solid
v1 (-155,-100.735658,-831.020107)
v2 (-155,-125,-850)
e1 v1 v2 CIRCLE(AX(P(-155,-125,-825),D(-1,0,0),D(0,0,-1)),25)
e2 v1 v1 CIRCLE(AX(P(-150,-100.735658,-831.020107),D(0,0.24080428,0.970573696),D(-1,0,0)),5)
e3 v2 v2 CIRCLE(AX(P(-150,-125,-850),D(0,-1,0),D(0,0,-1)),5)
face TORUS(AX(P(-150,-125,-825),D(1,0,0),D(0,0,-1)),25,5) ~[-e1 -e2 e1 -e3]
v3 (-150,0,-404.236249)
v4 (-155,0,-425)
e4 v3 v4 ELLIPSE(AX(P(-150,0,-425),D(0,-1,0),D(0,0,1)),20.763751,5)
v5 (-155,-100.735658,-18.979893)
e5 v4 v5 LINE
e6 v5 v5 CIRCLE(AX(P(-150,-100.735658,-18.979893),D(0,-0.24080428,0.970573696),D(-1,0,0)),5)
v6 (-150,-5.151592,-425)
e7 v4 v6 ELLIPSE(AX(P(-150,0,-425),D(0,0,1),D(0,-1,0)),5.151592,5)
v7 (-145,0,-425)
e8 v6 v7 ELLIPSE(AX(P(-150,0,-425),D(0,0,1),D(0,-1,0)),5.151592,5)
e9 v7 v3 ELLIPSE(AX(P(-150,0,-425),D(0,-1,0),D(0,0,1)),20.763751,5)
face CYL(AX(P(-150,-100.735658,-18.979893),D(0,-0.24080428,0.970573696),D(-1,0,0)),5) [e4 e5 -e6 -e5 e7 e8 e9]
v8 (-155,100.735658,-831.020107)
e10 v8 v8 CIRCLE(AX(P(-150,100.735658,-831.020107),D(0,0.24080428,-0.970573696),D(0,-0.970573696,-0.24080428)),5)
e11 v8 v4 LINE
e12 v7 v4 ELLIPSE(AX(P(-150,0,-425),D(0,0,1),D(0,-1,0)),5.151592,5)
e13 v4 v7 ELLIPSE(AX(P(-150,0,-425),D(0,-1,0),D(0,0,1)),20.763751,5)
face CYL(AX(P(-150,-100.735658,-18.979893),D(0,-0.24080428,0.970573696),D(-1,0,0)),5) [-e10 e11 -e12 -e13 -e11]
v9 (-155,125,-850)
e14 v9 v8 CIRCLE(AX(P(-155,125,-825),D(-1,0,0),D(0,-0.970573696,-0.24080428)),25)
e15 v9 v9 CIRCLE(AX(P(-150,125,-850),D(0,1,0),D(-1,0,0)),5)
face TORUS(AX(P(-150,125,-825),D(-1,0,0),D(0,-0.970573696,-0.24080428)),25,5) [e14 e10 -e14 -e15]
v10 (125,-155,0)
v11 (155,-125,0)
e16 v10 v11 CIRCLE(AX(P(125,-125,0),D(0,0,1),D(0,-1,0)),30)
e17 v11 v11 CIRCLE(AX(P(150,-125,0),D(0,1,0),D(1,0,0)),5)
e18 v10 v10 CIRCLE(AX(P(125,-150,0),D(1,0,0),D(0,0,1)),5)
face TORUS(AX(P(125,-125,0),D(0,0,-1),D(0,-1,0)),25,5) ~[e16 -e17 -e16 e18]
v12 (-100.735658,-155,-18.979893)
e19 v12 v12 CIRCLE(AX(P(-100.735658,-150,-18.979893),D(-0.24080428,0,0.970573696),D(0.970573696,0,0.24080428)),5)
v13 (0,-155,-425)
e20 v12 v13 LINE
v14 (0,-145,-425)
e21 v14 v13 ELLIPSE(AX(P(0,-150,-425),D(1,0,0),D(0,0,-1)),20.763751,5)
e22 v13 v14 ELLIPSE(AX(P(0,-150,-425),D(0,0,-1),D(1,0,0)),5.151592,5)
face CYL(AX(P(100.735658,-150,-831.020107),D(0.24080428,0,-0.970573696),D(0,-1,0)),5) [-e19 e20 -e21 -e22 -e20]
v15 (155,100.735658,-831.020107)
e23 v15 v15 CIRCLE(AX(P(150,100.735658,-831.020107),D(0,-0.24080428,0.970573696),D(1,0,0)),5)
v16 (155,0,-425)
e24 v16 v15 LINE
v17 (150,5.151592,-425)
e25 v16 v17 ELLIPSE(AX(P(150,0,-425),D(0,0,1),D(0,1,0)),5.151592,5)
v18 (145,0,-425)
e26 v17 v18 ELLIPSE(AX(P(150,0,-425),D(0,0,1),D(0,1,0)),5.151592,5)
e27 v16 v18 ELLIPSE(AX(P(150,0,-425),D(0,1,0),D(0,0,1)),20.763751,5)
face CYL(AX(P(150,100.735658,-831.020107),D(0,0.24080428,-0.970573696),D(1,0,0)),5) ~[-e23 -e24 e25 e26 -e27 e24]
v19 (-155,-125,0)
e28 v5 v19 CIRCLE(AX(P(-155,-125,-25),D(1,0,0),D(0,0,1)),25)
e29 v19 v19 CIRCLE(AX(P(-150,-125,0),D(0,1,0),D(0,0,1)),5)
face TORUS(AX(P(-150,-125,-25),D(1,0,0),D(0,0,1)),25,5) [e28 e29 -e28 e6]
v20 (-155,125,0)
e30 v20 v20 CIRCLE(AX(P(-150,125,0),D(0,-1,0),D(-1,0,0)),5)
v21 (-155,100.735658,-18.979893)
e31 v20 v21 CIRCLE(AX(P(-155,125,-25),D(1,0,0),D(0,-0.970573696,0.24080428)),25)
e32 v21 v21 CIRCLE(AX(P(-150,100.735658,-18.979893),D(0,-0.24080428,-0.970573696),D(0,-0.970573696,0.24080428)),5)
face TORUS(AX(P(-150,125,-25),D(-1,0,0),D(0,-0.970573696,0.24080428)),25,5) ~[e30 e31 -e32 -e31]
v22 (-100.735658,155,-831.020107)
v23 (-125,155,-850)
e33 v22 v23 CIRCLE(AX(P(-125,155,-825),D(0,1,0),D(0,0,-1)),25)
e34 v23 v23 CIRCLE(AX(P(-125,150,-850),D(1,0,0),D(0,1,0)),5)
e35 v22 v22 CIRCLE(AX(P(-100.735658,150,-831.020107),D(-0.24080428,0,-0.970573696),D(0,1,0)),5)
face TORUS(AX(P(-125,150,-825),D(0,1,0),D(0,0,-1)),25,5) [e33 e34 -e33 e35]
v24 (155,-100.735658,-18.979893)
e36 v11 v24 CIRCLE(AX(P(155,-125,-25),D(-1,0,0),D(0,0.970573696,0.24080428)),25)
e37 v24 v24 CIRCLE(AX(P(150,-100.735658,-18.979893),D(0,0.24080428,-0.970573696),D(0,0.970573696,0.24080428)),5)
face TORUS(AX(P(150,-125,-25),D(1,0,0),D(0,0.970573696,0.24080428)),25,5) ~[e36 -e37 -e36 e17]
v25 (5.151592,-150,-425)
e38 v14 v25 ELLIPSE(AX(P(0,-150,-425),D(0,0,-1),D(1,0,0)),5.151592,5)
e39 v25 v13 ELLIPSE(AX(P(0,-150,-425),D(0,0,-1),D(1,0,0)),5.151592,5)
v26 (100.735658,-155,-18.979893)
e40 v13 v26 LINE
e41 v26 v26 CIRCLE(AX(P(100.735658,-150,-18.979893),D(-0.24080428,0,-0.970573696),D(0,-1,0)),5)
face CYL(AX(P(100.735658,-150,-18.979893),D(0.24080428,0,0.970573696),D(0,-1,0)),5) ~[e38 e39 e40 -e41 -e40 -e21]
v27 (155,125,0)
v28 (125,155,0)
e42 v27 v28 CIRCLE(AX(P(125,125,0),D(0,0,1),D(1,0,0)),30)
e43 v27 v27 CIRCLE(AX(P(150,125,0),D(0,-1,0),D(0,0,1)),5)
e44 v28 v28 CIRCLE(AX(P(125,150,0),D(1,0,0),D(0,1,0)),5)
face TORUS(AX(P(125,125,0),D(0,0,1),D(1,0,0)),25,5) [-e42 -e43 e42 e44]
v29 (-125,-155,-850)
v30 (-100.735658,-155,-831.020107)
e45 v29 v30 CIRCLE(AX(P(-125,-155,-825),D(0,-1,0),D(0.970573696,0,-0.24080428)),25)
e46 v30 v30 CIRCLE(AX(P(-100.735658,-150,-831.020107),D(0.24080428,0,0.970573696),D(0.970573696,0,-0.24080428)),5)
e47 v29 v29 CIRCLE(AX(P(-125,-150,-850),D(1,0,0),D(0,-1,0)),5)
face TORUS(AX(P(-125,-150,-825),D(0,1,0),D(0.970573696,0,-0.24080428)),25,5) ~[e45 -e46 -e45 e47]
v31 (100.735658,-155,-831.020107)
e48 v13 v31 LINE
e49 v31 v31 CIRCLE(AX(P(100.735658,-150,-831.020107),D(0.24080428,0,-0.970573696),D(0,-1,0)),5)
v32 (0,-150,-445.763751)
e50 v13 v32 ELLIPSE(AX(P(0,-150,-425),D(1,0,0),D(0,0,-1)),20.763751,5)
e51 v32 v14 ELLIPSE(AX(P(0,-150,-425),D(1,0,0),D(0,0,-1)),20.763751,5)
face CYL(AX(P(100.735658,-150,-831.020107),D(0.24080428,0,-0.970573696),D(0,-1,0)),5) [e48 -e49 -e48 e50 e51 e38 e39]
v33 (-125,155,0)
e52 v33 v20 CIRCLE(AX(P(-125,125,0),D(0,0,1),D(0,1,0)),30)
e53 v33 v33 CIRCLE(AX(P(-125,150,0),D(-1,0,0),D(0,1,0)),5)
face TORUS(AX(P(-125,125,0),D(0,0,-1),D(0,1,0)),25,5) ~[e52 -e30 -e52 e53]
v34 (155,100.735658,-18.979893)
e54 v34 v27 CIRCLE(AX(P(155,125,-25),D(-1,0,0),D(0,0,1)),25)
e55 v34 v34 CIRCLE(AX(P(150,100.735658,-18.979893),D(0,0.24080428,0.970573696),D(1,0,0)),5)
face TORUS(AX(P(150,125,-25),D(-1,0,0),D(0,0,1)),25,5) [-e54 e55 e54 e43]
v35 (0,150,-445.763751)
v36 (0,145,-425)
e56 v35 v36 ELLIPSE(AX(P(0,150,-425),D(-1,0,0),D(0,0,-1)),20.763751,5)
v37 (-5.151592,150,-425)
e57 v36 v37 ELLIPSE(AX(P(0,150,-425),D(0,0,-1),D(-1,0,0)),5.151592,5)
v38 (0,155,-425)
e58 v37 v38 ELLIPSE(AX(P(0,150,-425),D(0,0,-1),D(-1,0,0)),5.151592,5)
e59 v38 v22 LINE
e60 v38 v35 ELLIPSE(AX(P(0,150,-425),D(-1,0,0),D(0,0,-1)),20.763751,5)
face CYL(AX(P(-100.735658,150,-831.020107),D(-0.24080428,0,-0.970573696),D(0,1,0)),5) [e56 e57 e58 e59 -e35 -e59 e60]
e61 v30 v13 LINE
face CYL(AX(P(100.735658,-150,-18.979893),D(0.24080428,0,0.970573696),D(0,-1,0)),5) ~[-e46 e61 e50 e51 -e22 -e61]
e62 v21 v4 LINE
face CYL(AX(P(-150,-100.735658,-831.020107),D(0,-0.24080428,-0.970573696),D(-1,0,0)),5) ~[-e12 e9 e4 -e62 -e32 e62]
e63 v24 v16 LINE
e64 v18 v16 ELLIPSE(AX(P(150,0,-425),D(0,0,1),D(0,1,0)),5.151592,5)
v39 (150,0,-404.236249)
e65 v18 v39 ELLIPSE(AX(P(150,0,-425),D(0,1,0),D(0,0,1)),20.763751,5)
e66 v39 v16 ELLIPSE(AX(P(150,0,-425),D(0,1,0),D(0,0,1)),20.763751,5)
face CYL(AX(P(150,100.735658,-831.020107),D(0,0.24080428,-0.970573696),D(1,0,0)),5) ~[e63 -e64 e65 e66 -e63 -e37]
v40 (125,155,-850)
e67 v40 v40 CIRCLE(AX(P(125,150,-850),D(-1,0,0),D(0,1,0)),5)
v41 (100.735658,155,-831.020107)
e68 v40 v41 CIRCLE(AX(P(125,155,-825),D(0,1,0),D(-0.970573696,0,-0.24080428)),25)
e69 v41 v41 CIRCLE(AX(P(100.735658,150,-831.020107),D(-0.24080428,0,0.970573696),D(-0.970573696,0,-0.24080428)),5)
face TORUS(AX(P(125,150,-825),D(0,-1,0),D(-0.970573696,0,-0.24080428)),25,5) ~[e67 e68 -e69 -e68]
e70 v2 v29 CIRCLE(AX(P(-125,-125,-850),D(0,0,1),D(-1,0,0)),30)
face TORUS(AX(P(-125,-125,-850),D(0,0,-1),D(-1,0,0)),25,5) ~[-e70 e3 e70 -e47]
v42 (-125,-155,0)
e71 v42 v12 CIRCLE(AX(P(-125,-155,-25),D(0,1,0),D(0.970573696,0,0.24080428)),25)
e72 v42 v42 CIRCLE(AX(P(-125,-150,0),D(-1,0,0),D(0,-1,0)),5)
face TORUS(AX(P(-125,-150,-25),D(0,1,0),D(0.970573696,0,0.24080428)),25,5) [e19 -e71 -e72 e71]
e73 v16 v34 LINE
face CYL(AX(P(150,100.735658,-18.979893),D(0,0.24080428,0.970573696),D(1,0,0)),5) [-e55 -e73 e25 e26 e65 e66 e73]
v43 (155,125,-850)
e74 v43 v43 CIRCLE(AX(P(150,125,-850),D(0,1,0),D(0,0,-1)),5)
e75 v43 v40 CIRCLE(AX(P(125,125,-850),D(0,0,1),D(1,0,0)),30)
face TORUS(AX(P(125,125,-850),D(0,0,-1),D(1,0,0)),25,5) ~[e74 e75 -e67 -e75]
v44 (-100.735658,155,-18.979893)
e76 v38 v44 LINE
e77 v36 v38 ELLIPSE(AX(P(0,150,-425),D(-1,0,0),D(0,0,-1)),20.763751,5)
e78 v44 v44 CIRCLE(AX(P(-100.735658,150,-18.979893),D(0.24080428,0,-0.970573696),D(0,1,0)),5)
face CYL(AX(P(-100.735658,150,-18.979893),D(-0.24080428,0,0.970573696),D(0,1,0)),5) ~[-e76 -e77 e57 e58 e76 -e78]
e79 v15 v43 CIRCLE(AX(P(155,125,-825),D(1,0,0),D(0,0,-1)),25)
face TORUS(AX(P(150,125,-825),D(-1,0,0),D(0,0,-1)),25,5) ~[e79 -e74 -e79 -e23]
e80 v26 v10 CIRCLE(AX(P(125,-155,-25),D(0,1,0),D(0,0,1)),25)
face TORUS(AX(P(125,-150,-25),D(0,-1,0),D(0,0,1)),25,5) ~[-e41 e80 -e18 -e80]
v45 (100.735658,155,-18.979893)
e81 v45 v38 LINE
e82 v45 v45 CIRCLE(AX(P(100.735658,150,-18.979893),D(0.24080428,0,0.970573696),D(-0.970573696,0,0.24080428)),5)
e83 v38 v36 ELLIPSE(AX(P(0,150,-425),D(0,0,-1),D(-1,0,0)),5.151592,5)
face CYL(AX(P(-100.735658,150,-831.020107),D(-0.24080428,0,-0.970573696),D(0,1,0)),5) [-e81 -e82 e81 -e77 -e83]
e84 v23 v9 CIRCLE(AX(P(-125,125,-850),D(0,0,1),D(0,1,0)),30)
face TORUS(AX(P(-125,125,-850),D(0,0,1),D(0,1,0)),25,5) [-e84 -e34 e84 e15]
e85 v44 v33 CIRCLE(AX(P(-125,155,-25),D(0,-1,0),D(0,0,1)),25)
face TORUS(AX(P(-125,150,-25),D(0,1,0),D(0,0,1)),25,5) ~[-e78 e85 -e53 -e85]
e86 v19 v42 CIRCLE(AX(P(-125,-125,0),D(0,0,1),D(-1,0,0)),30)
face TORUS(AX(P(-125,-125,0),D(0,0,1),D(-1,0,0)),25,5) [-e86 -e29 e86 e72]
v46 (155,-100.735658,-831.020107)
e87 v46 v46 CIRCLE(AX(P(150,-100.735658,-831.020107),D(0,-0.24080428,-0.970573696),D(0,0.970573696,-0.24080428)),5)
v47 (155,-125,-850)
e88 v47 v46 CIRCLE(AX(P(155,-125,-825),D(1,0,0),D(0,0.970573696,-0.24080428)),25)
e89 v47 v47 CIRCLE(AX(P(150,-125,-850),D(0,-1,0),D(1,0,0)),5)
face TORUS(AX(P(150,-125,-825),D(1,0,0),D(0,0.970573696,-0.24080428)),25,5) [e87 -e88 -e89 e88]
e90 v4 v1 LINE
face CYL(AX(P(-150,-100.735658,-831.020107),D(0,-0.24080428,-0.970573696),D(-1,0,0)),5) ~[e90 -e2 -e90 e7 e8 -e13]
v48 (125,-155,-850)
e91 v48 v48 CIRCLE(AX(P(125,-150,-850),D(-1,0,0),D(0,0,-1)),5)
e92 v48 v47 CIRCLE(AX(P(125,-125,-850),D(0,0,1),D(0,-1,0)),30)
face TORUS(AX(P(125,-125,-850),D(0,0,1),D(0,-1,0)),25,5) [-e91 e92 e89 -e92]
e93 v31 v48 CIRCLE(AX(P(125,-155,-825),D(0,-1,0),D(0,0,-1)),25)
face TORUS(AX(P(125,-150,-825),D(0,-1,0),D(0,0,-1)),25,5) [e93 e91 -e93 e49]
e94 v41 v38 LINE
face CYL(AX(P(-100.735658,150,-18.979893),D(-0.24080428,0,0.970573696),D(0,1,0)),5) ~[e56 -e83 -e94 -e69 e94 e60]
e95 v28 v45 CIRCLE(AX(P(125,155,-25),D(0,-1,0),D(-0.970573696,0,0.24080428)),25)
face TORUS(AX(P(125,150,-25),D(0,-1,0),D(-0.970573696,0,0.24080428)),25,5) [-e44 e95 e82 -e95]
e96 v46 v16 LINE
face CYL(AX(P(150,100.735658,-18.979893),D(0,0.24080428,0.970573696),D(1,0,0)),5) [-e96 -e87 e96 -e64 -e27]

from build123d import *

# Parameters (mm, degrees)
F9_R              = 5
F10_COPIES1_COUNT = 2


# Not quite as in the source:
# - a feature of the source that left no trace in its solid (it failed there, or was rolled back) is left out
# - a pattern or mirror of a feature is missing from the dataset's text; its kind, count and spacing are read off the source's solid


with BuildPart() as f10:
    # F10: sweep along a path in F7, F2, F0, F5, F7
    with BuildLine(Plane.XY.offset(-850)) as f10_path:
        ThreePointArc((125, -150), (142.6776695297, -142.6776695297), (150, -125))
    with BuildLine(Plane.XZ.offset(150)) as f10_path_2:
        ThreePointArc((125, -850), (109.5971216154, -844.6914026283), (100.7356576076, -831.0201069976))
        Line((100.7356576076, -831.0201069976), (-100.7356576076, -18.9798930024))
        ThreePointArc((-100.7356576076, -18.9798930024), (-109.5971216154, -5.3085973717), (-125, 0))
    with BuildLine(Plane.XY) as f10_path_3:
        ThreePointArc((-150, -125), (-142.6776695297, -142.6776695297), (-125, -150))
    with BuildLine(Plane.YZ.offset(-150)) as f10_path_4:
        ThreePointArc((-125, 0), (-109.5971216154, -5.3085973717), (-100.7356576076, -18.9798930024))
        Line((-100.7356576076, -18.9798930024), (100.7356576076, -831.0201069976))
        ThreePointArc((100.7356576076, -831.0201069976), (109.5971216154, -844.6914026283), (125, -850))
    with BuildLine(Plane.XY.offset(-850)) as f10_path_5:
        ThreePointArc((-125, 150), (-142.6776695297, 142.6776695297), (-150, 125))
    # F9 (on plane+point) → F10 (sweep)
    with BuildSketch(Plane.XZ.offset(125)):
        with Locations((150, -850)):
            Circle(F9_R)
    sweep(path=f10_path.line + f10_path_2.line + f10_path_3.line + f10_path_4.line + f10_path_5.line)

    # F10_copies: F10 across plane


with BuildPart() as f10_1:
    add(f10.part)
    add(f10.part.mirror(Plane.XY.offset(-425)))

    # F10_copies1: F10 ×2 about axis
    f10_copies1_axis = Axis((0, 0, 0), (0, 0, 1))


with BuildPart() as f10_2:
    add(f10_1.part)
    for i in range(1, F10_COPIES1_COUNT):
        add(f10_1.part.rotate(f10_copies1_axis, i * 360 / F10_COPIES1_COUNT))


solid = f10_2.part
